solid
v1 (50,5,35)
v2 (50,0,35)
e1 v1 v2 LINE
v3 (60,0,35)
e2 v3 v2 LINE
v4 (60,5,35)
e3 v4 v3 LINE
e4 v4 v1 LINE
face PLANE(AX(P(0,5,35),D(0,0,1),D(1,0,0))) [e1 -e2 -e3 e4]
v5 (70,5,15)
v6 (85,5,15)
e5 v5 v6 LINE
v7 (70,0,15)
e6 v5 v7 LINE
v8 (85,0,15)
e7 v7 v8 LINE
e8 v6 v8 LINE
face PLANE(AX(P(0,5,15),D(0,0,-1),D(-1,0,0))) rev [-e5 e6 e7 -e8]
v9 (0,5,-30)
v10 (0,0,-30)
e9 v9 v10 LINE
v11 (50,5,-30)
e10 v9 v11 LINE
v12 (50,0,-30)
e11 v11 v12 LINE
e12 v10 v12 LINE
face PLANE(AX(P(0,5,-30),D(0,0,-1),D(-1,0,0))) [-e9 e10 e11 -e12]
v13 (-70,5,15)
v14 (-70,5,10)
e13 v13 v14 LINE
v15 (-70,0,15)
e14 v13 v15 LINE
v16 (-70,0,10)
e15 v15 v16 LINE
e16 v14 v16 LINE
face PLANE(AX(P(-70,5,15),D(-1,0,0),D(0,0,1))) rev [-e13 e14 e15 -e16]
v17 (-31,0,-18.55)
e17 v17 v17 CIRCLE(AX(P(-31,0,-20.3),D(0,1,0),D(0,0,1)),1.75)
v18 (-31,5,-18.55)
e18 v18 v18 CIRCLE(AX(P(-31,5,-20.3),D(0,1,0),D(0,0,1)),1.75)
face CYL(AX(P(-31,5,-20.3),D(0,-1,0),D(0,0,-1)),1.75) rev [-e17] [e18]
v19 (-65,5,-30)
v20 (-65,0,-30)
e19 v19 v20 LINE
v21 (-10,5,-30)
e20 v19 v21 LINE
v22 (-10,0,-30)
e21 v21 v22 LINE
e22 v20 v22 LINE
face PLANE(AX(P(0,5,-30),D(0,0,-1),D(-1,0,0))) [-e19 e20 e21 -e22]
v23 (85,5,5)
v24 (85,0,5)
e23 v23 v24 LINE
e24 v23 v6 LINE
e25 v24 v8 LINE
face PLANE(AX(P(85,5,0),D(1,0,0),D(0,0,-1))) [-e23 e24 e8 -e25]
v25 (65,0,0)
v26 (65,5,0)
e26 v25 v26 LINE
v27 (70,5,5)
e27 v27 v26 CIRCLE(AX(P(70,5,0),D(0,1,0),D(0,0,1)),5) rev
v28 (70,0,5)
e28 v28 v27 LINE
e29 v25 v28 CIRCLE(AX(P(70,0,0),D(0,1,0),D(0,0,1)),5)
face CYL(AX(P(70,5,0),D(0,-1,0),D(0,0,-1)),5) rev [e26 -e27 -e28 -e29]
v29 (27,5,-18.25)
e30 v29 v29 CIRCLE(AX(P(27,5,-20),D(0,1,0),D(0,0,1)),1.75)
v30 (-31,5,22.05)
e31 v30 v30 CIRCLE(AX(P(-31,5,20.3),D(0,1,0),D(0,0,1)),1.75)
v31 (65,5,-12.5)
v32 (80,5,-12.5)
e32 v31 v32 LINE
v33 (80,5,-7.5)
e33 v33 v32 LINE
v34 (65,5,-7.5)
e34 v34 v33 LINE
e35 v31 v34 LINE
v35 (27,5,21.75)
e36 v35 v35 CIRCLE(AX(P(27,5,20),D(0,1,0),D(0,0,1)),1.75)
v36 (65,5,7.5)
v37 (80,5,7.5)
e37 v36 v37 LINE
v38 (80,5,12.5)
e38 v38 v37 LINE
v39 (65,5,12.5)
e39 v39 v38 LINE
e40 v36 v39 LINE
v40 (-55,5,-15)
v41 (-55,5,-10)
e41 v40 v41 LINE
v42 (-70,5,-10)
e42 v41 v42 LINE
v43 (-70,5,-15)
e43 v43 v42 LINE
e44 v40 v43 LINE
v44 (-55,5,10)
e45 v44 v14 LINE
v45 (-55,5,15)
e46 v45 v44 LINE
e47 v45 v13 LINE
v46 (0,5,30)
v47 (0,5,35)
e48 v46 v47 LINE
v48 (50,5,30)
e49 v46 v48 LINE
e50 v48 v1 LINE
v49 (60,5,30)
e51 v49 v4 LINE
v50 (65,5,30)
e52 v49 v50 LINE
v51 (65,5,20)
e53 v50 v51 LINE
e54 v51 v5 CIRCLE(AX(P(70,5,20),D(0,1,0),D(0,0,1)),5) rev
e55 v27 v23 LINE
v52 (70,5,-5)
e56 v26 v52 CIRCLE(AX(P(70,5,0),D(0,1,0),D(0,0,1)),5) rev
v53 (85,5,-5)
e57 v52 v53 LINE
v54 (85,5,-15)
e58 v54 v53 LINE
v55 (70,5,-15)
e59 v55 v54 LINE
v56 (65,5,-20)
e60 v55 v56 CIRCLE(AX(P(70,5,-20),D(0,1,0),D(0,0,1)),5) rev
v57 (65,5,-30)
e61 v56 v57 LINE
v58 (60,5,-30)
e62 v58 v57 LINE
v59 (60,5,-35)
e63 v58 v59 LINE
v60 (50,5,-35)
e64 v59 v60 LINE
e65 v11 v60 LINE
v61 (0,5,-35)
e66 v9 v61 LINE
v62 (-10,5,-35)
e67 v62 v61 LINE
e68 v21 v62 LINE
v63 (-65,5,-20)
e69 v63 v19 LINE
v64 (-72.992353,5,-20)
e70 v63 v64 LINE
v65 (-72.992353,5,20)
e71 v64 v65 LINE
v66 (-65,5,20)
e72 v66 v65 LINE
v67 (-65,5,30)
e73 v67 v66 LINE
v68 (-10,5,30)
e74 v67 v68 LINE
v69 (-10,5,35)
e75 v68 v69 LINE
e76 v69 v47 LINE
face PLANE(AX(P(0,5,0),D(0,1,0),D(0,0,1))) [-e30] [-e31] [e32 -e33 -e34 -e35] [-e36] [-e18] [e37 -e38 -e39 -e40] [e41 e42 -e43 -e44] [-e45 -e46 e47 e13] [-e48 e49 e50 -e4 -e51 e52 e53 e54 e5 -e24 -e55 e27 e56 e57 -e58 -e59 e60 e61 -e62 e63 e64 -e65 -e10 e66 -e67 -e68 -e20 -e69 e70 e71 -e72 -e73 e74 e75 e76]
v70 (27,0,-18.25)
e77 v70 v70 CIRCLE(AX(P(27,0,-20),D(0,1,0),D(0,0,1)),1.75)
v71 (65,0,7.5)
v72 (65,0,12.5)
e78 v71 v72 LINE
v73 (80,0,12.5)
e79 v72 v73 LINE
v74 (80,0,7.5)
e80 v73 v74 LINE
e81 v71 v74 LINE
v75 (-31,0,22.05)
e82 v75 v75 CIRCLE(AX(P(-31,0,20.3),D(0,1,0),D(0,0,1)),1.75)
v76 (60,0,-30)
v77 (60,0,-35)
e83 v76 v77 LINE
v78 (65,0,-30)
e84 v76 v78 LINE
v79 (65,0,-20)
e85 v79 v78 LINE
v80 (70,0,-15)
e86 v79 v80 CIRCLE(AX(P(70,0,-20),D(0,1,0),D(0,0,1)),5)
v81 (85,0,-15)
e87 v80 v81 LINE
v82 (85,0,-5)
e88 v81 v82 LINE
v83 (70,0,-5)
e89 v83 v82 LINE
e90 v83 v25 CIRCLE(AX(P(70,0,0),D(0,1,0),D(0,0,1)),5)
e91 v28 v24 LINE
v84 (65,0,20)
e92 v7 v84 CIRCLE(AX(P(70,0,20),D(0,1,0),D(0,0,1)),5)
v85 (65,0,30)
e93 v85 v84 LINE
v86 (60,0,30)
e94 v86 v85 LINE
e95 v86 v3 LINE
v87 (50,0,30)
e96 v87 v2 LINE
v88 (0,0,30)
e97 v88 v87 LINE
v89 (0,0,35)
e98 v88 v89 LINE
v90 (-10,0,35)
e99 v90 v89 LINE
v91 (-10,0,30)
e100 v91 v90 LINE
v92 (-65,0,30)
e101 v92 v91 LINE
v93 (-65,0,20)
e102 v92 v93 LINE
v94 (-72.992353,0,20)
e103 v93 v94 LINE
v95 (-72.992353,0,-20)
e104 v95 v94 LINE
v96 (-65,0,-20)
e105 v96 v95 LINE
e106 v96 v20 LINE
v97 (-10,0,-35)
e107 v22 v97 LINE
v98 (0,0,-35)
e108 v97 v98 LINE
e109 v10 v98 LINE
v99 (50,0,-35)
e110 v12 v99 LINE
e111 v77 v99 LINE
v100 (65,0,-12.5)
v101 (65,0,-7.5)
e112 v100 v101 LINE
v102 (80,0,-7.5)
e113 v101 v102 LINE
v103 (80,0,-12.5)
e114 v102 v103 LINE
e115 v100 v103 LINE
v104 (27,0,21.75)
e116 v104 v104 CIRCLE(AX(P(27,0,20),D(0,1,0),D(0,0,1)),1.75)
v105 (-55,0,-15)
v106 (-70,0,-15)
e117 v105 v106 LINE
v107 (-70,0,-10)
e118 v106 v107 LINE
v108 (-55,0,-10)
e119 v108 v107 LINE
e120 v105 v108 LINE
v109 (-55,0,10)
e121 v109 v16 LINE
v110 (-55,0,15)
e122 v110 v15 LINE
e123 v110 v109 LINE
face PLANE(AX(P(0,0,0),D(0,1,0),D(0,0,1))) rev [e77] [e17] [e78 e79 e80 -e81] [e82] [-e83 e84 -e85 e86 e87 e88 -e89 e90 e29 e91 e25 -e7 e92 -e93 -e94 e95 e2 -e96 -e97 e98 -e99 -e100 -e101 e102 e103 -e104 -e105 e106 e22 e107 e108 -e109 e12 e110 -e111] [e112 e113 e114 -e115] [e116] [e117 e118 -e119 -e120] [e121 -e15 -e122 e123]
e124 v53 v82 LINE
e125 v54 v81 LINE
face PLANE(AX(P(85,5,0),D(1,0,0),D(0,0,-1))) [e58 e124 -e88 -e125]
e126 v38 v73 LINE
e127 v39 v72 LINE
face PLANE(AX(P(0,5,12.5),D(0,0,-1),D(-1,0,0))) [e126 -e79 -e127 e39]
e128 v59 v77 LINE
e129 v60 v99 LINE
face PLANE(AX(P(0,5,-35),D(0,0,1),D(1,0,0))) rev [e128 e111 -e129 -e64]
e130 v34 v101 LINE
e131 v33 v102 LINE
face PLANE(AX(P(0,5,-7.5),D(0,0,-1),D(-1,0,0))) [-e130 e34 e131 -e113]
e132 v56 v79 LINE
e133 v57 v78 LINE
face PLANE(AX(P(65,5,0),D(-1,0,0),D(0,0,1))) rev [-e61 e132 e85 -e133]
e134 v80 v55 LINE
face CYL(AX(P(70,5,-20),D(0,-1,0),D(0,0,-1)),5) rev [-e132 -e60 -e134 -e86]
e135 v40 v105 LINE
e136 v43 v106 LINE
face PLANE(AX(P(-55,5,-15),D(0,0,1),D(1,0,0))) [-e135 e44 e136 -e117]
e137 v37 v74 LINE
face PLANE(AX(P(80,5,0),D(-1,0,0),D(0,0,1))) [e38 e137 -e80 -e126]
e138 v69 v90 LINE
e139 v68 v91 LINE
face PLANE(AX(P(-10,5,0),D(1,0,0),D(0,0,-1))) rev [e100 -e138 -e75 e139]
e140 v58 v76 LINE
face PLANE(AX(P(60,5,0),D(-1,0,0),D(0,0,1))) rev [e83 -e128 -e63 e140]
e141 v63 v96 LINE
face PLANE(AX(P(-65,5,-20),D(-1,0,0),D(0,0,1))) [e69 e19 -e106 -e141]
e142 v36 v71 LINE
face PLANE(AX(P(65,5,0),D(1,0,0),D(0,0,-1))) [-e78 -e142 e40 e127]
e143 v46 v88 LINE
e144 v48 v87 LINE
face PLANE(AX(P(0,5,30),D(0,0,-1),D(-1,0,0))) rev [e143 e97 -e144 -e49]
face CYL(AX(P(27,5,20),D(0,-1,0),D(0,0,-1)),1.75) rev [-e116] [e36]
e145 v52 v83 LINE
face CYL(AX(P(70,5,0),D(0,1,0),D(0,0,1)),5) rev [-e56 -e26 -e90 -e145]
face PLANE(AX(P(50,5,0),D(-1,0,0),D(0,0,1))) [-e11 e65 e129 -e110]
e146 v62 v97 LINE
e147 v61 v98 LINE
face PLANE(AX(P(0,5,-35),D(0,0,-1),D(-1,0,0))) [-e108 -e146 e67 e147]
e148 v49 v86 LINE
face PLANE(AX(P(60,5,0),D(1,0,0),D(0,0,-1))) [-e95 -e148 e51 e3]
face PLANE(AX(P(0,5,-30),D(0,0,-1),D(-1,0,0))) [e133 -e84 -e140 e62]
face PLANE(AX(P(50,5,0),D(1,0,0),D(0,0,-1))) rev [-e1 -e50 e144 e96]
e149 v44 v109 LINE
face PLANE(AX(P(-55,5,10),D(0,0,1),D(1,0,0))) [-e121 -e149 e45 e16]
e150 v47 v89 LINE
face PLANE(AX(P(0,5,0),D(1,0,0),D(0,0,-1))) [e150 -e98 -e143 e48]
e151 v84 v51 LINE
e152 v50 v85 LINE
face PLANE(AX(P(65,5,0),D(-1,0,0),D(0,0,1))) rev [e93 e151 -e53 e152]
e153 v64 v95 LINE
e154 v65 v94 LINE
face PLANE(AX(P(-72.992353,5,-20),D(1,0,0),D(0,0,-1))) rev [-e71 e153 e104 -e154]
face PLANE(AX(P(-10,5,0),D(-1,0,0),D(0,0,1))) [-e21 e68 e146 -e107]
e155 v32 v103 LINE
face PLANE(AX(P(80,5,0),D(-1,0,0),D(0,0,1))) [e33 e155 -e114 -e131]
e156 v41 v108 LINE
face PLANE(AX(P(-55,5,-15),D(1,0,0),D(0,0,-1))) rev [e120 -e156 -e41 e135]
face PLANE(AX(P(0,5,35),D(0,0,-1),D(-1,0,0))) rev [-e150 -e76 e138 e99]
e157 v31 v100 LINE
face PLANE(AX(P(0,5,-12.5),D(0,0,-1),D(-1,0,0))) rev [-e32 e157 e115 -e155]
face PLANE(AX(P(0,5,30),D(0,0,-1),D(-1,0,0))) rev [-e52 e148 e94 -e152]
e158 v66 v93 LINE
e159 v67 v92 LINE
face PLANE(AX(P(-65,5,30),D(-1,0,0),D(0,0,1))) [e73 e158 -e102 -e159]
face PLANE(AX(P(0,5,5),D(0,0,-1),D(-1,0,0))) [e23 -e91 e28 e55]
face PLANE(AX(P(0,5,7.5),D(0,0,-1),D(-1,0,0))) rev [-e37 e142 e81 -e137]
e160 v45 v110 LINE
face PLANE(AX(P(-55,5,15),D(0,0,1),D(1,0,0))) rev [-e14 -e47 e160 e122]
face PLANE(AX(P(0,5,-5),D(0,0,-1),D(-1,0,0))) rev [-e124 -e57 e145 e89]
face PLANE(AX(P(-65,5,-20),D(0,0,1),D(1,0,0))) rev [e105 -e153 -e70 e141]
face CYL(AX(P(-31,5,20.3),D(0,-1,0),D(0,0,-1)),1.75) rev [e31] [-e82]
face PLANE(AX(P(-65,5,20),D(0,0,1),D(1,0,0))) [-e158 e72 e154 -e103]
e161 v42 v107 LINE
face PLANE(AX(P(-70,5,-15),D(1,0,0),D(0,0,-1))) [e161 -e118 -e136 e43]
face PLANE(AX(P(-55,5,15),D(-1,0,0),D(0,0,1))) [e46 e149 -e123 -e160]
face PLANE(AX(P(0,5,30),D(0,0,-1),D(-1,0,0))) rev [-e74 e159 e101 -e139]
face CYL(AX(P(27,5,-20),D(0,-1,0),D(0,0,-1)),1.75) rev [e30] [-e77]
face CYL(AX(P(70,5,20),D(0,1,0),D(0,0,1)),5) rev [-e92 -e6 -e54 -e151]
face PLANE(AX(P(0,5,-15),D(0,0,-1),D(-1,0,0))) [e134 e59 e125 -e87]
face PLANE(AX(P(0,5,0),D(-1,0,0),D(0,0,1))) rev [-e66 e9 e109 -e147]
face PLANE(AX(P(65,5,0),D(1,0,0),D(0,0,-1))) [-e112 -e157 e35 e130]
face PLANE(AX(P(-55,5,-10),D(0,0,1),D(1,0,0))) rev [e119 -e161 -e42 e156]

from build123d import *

# Parameters (mm, degrees)
SKETCH1_R           = 1.75
SKETCH1_W           = 15
SKETCH1_H           = 5
BOSS_EXTRUDE1_DEPTH = 5
FILLET1_R           = 5


with BuildPart() as part:
    # Sketch1 → Boss-Extrude1 (new body)
    with BuildSketch(Plane(origin=(0, 0, 0), x_dir=(1, 0, 0), z_dir=(0, 1, 0))):
        Polygon((65, 15), (65, 30), (60, 30), (60, 35), (50, 35), (50, 30), (0, 30), (0, 35), (-10, 35), (-10, 30), (-65, 30), (-65, 20), (-72.992352801, 20), (-72.992352801, 5), (-72.992352801, -5), (-72.992352801, -20), (-65, -20), (-65, -30), (-10, -30), (-10, -35), (0, -35), (0, -30), (50, -30), (50, -35), (60, -35), (60, -30), (65, -30), (65, -15), (85, -15), (85, -5), (65, -5), (65, 5), (85, 5), (85, 15), align=None)
        with Locations(Location((27, 20, 0), (0, 0, 270))):
            Circle(SKETCH1_R, mode=Mode.SUBTRACT)
        with Locations(Location((27, -20, 0), (0, 0, 270))):
            Circle(SKETCH1_R, mode=Mode.SUBTRACT)
        with Locations(Location((-31, 20.3, 0), (0, 0, 270))):
            Circle(SKETCH1_R, mode=Mode.SUBTRACT)
        with Locations(Location((-31, -20.3, 0), (0, 0, 270))):
            Circle(SKETCH1_R, mode=Mode.SUBTRACT)
        with Locations((72.5, 10)):
            Rectangle(SKETCH1_W, SKETCH1_H, mode=Mode.SUBTRACT)
        with Locations((72.5, -10)):
            Rectangle(SKETCH1_W, SKETCH1_H, mode=Mode.SUBTRACT)
        with Locations((-62.5, 12.5)):
            Rectangle(SKETCH1_W, SKETCH1_H, mode=Mode.SUBTRACT)
        with Locations((-62.5, -12.5)):
            Rectangle(SKETCH1_W, SKETCH1_H, mode=Mode.SUBTRACT)
    extrude(amount=BOSS_EXTRUDE1_DEPTH)

    # Fillet1
    fillet1_edges = [part.edges().sort_by_distance(p)[0] for p in [
        (65, 2.5, -15),
        (65, 2.5, -5),
        (65, 2.5, 5),
        (65, 2.5, 15),
    ]]
    fillet(fillet1_edges, radius=FILLET1_R - 0.0001)  # a hair under: the kernel refuses the full size


solid = part.part
